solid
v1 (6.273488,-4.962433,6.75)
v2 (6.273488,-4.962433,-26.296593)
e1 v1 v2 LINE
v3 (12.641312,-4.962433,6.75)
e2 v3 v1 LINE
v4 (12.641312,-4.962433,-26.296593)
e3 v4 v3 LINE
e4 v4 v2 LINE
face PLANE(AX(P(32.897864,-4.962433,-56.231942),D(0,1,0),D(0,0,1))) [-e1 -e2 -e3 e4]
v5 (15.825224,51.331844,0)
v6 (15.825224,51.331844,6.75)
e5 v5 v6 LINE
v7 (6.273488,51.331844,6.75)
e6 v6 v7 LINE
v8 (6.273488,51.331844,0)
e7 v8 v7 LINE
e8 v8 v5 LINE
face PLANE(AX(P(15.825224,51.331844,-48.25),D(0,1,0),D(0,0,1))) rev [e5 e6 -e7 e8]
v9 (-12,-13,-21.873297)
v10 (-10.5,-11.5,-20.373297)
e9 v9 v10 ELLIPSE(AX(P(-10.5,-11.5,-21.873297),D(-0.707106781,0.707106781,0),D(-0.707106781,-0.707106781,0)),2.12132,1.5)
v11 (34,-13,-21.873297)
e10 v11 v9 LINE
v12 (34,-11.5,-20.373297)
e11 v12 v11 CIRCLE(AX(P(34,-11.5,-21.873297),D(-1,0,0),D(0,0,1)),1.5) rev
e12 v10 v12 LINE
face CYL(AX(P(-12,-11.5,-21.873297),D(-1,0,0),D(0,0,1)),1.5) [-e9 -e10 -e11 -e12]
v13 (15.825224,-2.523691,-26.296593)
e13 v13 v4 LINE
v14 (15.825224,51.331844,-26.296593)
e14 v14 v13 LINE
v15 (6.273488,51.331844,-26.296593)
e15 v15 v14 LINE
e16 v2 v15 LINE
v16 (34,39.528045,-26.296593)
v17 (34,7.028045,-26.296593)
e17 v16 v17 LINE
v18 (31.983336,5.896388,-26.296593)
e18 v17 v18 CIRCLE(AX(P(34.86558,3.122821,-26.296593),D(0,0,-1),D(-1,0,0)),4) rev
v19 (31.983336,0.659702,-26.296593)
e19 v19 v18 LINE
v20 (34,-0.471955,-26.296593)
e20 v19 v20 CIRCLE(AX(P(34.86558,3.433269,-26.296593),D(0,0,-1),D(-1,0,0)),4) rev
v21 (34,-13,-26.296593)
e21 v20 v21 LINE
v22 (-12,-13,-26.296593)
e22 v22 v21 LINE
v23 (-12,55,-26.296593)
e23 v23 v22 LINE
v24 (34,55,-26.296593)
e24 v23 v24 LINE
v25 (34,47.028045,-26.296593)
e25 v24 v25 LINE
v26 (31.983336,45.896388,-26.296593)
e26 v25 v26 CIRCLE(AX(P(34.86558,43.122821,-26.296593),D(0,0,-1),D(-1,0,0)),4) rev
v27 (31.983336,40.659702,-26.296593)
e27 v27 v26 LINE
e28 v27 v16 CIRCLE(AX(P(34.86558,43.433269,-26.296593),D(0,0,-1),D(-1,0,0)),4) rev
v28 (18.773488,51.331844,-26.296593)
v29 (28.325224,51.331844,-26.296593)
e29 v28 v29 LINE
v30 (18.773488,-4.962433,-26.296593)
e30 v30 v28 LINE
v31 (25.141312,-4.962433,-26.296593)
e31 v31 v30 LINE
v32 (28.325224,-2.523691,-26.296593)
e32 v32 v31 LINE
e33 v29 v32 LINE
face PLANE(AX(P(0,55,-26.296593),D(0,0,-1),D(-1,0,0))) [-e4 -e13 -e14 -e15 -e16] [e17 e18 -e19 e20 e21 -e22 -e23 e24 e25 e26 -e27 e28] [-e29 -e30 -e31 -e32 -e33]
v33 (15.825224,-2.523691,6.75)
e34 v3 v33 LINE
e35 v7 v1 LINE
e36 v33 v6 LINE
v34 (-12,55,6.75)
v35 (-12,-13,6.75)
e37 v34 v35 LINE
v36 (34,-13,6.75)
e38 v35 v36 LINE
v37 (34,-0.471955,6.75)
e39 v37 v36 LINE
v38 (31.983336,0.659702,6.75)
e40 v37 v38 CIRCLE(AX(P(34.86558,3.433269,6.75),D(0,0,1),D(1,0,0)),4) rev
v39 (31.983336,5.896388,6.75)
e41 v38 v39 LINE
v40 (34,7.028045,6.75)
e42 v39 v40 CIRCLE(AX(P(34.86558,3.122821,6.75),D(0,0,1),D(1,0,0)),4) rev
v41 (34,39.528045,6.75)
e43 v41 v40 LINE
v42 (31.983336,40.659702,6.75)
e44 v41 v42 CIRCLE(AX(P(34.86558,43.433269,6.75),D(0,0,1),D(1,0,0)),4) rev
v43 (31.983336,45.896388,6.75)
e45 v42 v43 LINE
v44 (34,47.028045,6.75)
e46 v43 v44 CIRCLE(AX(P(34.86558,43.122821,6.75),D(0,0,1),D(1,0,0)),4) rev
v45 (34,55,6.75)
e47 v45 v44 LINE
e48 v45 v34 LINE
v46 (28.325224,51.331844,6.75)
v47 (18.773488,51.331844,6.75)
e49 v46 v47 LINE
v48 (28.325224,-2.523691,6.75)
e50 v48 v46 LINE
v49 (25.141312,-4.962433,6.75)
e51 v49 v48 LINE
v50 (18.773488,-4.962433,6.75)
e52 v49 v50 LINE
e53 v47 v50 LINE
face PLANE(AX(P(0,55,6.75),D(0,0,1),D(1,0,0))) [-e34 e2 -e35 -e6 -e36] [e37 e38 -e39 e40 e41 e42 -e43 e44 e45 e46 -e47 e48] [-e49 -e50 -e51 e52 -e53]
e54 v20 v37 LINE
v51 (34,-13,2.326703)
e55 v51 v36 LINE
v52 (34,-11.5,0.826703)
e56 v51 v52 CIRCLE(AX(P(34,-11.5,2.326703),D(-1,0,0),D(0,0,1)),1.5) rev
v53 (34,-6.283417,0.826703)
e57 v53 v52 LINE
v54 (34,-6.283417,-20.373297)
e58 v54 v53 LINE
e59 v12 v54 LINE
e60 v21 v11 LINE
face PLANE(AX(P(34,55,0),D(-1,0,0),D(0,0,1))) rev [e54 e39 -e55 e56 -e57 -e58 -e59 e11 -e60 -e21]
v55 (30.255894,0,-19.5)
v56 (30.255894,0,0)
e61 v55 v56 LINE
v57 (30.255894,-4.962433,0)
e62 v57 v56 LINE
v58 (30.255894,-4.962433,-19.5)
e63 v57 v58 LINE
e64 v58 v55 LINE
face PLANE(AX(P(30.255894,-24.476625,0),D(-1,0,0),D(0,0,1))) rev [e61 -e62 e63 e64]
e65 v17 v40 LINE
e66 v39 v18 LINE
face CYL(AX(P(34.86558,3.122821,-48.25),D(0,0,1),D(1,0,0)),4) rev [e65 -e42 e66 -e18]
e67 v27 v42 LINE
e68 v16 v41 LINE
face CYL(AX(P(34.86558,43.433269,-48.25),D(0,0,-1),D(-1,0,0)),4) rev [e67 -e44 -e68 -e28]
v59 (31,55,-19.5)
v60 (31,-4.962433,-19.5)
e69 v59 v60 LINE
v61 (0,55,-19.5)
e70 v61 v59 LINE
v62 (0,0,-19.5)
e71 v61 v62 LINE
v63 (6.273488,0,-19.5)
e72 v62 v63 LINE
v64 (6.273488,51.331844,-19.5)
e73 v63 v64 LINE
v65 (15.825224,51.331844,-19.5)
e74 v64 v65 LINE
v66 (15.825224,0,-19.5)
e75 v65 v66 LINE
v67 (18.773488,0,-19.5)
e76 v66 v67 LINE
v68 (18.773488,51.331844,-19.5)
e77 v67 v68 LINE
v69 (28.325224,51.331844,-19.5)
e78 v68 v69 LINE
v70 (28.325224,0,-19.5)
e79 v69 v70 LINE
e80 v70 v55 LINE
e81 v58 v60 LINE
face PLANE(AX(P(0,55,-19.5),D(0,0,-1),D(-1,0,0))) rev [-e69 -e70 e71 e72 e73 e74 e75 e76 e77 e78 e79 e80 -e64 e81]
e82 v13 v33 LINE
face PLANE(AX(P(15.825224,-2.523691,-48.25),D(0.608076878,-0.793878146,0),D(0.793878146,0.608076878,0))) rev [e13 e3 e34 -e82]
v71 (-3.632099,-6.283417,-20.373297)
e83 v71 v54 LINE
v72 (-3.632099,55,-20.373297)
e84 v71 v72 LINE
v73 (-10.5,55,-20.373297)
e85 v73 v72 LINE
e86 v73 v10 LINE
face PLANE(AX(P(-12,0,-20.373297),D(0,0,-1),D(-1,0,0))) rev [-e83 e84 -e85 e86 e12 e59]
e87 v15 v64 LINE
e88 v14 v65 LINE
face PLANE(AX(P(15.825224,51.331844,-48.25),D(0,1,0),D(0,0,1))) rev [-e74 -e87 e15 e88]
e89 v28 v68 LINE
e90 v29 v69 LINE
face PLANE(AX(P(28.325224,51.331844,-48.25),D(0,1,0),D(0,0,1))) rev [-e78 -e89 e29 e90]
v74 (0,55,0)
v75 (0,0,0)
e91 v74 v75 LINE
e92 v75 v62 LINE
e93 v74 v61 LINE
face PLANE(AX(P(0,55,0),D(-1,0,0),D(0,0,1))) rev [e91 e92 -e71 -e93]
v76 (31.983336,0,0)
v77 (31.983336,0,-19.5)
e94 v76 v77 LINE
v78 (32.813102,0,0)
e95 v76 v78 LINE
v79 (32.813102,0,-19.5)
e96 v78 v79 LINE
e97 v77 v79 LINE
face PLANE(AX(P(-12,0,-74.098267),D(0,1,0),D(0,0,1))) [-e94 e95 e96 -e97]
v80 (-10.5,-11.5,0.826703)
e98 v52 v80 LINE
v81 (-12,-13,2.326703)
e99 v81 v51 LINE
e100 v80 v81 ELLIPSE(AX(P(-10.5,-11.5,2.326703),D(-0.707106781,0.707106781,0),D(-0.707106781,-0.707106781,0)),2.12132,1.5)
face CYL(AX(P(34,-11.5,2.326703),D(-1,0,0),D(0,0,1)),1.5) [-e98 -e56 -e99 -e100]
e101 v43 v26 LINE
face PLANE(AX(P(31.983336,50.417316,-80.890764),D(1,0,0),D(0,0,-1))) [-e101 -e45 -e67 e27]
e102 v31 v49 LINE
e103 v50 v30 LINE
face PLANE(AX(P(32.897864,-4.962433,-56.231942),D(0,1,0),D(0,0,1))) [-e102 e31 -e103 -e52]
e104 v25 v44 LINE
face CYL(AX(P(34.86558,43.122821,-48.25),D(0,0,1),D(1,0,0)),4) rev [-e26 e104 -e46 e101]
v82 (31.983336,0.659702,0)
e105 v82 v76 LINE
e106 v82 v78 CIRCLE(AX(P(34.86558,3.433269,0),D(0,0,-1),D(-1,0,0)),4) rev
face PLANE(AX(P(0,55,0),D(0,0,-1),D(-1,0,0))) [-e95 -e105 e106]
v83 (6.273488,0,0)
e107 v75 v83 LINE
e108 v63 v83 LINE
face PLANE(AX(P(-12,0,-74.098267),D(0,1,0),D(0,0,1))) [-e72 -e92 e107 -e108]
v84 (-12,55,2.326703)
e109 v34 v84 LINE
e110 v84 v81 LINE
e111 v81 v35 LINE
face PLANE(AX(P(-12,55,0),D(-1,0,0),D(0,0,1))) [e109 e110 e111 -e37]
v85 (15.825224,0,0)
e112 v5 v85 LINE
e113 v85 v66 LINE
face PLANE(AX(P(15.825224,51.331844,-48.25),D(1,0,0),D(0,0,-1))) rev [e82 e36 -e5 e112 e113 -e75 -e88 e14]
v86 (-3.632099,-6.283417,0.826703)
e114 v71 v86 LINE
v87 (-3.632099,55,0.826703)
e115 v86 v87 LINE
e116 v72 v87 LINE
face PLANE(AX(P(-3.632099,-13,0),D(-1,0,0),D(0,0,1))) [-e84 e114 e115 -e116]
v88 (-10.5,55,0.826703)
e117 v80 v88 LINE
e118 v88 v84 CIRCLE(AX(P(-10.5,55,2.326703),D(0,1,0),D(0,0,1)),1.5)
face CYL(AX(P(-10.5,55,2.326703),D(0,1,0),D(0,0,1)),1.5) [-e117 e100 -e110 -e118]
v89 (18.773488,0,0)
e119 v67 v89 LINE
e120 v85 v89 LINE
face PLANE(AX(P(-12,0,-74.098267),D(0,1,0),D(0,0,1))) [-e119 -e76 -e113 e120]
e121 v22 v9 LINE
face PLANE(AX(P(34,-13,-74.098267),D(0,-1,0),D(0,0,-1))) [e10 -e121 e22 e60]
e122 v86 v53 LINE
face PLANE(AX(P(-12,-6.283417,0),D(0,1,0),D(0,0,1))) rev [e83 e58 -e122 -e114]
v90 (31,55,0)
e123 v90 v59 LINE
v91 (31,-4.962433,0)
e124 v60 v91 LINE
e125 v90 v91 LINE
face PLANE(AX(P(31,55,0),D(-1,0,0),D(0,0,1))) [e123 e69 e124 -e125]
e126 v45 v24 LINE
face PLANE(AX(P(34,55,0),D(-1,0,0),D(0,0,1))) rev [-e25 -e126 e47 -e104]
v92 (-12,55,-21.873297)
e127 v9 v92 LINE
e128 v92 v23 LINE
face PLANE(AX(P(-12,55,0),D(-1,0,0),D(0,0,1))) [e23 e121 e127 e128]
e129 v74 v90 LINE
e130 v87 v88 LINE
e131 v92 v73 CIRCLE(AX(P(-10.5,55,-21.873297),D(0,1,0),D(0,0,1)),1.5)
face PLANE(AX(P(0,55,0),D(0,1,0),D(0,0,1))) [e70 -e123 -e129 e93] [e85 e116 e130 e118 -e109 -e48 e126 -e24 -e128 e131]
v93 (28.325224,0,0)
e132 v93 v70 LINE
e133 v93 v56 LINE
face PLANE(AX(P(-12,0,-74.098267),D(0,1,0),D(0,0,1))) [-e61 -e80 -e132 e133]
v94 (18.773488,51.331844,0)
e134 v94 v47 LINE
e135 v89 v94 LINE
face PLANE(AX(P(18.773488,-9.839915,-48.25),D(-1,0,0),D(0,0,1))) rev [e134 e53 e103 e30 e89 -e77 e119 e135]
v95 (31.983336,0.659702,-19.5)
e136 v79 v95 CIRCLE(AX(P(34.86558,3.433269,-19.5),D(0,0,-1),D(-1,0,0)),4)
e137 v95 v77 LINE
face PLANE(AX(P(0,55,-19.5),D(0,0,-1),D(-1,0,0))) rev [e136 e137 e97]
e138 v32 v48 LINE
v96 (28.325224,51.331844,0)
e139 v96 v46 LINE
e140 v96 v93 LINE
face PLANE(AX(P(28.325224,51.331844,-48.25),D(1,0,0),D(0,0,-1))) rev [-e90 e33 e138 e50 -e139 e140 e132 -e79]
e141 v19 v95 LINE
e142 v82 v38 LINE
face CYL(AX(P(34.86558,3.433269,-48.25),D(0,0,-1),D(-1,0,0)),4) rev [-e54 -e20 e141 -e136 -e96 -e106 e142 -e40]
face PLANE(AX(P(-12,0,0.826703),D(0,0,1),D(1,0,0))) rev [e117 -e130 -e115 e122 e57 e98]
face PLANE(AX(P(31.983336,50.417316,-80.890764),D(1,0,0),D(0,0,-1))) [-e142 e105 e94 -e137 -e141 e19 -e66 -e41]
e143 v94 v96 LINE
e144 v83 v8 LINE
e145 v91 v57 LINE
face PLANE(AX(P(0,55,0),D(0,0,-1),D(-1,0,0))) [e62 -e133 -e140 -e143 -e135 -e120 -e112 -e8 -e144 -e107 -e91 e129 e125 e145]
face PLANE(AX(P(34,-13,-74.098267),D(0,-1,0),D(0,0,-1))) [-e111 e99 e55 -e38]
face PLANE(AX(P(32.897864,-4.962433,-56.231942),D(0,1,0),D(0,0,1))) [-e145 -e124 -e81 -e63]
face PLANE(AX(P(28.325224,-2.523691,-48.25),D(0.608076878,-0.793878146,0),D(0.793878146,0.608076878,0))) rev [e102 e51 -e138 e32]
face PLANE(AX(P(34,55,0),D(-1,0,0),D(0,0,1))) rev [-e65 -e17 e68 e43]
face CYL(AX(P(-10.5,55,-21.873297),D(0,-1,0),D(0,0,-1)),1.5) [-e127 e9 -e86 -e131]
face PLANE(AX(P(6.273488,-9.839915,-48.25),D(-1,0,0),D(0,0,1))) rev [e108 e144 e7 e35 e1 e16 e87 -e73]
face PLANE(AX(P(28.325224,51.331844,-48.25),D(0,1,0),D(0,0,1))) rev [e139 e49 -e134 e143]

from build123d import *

# Parameters (mm, degrees)
BOSS_EXTRUDE1_DEPTH = 55
SKETCH2_W           = 46
SKETCH2_H           = 13
BOSS_EXTRUDE2_DEPTH = 33.046593186
CUT_EXTRUDE1_DEPTH  = 77.370876735
SKETCH4_W           = 3
SKETCH4_H           = 21.2
CUT_EXTRUDE2_DEPTH  = 81.445701024
CUT_EXTRUDE5_DEPTH  = 55
BOSS_EXTRUDE3_START = -33.046593
SKETCH6_W           = 29.264894646
SKETCH6_H           = 6.300081486
BOSS_EXTRUDE3_DEPTH = 33.046593
SKETCH7_W           = 21.2
SKETCH7_H           = 6.716582595
CUT_EXTRUDE6_DEPTH  = 77.370876735
SKETCH8_W           = 3.134420474
SKETCH8_H           = 7.5
CUT_EXTRUDE7_DEPTH  = 55
FILLET1_R           = 4
BOSS_EXTRUDE4_START = -33.046593
SKETCH9_W           = 1.727441698
SKETCH9_H           = 54.56683481
BOSS_EXTRUDE4_DEPTH = 33.046593
SKETCH10_W          = 0.74410578
SKETCH10_H          = 19.5
CUT_EXTRUDE8_DEPTH  = 59.962432577
FILLET2_R           = 1.5


with BuildPart() as part:
    # Sketch1 → Boss-Extrude1 (new body)
    with BuildSketch(Plane(origin=(0, 0, 0), x_dir=(1, 0, 0), z_dir=(0, 1, 0))):
        Polygon((31, -3.75), (31, 0), (0, 0), (0, 19.5), (31, 19.5), (31, 23.296593186), (34, 23.296593186), (34, 26.296593186), (-12, 26.296593186), (-12, -6.75), (34, -6.75), (34, -3.75), align=None)
        Polygon((31, 9.75), (31, 0), (31, -3.75), (34, -3.75), (34, 23.296593186), (31, 23.296593186), (31, 19.5), align=None)
    extrude(amount=BOSS_EXTRUDE1_DEPTH)

    # Sketch2 → Boss-Extrude2 (add)
    with BuildSketch(Plane.XY.offset(6.75)):
        with Locations((11, -6.5)):
            Rectangle(SKETCH2_W, SKETCH2_H)
    extrude(amount=-BOSS_EXTRUDE2_DEPTH)

    # Sketch3 → Cut-Extrude1 (cut, through all)
    with BuildSketch(Plane(origin=(34, 0, 0), x_dir=(0, 0, -1), z_dir=(1, 0, 0))):
        Polygon((-0.826703407, -6.283417405), (-0.826703407, -13), (9.773296593, -13), (20.373296593, -13), (20.373296593, -6.283417405), align=None)
    extrude(amount=-CUT_EXTRUDE1_DEPTH, mode=Mode.SUBTRACT)

    # Sketch4 → Cut-Extrude2 (cut, through all)
    with BuildSketch(Plane(origin=(0, 55, 0), x_dir=(1, 0, 0), z_dir=(0, 1, 0))):
        with Locations((-5.132099024, 9.773296593)):
            Rectangle(SKETCH4_W, SKETCH4_H)
        Polygon((-12, 20.373296593), (-12, 9.773296593), (-12, -0.826703407), (-6.632099024, -0.826703407), (-6.632099024, 20.373296593), align=None)
    extrude(amount=-CUT_EXTRUDE2_DEPTH, mode=Mode.SUBTRACT)

    # Sketch5 → Cut-Extrude5 (cut)
    with BuildSketch(Plane.XY.offset(6.75)):
        Polygon((28.325224087, 51.33184393), (18.77348764, 51.33184393), (18.77348764, 44.015620269), (18.77348764, -9.839915018), (28.325224087, -2.523691356), align=None)
        Polygon((6.27348764, -9.839915018), (6.27348764, 44.015620269), (6.27348764, 51.33184393), (15.825224087, 51.33184393), (15.825224087, -2.523691356), align=None)
    extrude(amount=-CUT_EXTRUDE5_DEPTH, mode=Mode.SUBTRACT)

    # Sketch6 → Boss-Extrude3 (add)
    with BuildSketch(Plane.XY.offset(6.75).offset(BOSS_EXTRUDE3_START)):
        with Locations((18.265416553, -8.11247332)):
            Rectangle(SKETCH6_W, SKETCH6_H)
    extrude(amount=BOSS_EXTRUDE3_DEPTH)

    # Sketch7 → Cut-Extrude6 (cut, through all)
    with BuildSketch(Plane(origin=(34, 0, 0), x_dir=(0, 0, -1), z_dir=(1, 0, 0))):
        with Locations((9.773296593, -9.641708703)):
            Rectangle(SKETCH7_W, SKETCH7_H)
    extrude(amount=-CUT_EXTRUDE6_DEPTH, mode=Mode.SUBTRACT)

    # Sketch8 → Cut-Extrude7 (cut)
    with BuildSketch(Plane.XY.offset(6.75)):
        with Locations((32.432789763, 3.278045091)):
            Rectangle(SKETCH8_W, SKETCH8_H)
        with Locations((32.432789763, 43.278045091)):
            Rectangle(SKETCH8_W, SKETCH8_H)
    extrude(amount=-CUT_EXTRUDE7_DEPTH, mode=Mode.SUBTRACT)

    # Fillet1
    # the kernel refuses this fillet: 4 mm, written as the material it adds along each edge
    with BuildSketch(Plane(origin=(30.865579526, -0.471954909, 6.75), x_dir=(1, 0, 0), z_dir=(0, 0, -1))) as fillet1_piece_1_section:
        with BuildLine():
            CenterArc((4, -3.905223692), FILLET1_R, 102.497374798, 77.502625202)
            Line((0, -3.905223692), (-0.08, -3.905223692))
            Line((-0.08, -3.905223692), (-0.08, 0))
            Line((-0.08, 0), (0, 0.08))
            ThreePointArc((0, 0.08), (1.567210237, 0.08), (3.117108884, 0.078104474))
            Line((3.117108884, 0.078104474), (3.134420474, 0))
        make_face()
    fillet1_piece_1 = extrude(amount=33.046593186, mode=Mode.PRIVATE)
    fillet1_piece_1 = split(fillet1_piece_1, bisect_by=Plane(origin=(32.12921107, 0, 3.375), z_dir=(0, -1, 0)), keep=Keep.TOP, mode=Mode.PRIVATE)
    fillet1_piece_1 = split(fillet1_piece_1, bisect_by=Plane(origin=(32.12921107, -0.298742451, 0), z_dir=(0, 0, 1)), keep=Keep.TOP, mode=Mode.PRIVATE)
    add(fillet1_piece_1)
    with BuildSketch(Plane(origin=(30.865579526, -0.471954909, 6.75), x_dir=(1, 0, 0), z_dir=(0, 0, -1))) as fillet1_piece_2_section:
        with BuildLine():
            CenterArc((4, -3.905223692), FILLET1_R, 102.497374798, 77.502625202)
            Line((0, -3.905223692), (-0.08, -3.905223692))
            Line((-0.08, -3.905223692), (-0.08, 0))
            Line((-0.08, 0), (0, 0.08))
            ThreePointArc((0, 0.08), (1.567210237, 0.08), (3.117108884, 0.078104474))
            Line((3.117108884, 0.078104474), (3.134420474, 0))
        make_face()
    fillet1_piece_2 = extrude(amount=33.046593186, mode=Mode.PRIVATE)
    fillet1_piece_2 = split(fillet1_piece_2, bisect_by=Plane(origin=(31.341073978, 0, 3.375), z_dir=(0, 1, 0)), keep=Keep.TOP, mode=Mode.PRIVATE)
    fillet1_piece_2 = split(fillet1_piece_2, bisect_by=Plane(origin=(31.341073978, 0.922666131, 0), z_dir=(0, 0, 1)), keep=Keep.TOP, mode=Mode.PRIVATE)
    add(fillet1_piece_2)
    with BuildSketch(Plane(origin=(30.865579526, -0.471954909, 6.75), x_dir=(1, 0, 0), z_dir=(0, 0, -1))) as fillet1_piece_3_section:
        with BuildLine():
            CenterArc((4, -3.905223692), FILLET1_R, 102.497374798, 77.502625202)
            Line((0, -3.905223692), (-0.08, -3.905223692))
            Line((-0.08, -3.905223692), (-0.08, 0))
            Line((-0.08, 0), (0, 0.08))
            ThreePointArc((0, 0.08), (1.567210237, 0.08), (3.117108884, 0.078104474))
            Line((3.117108884, 0.078104474), (3.134420474, 0))
        make_face()
    fillet1_piece_3 = extrude(amount=33.046593186, mode=Mode.PRIVATE)
    fillet1_piece_3 = split(fillet1_piece_3, bisect_by=Plane(origin=(32.12921107, -0.298742451, -19.5), z_dir=(0, 0, 1)), keep=Keep.TOP, mode=Mode.PRIVATE)
    fillet1_piece_3 = split(fillet1_piece_3, bisect_by=Plane(origin=(32.12921107, 0, -9.75), z_dir=(0, -1, 0)), keep=Keep.TOP, mode=Mode.PRIVATE)
    fillet1_piece_3 = split(fillet1_piece_3, bisect_by=Plane(origin=(32.12921107, -0.298742451, 0), z_dir=(0, 0, -1)), keep=Keep.TOP, mode=Mode.PRIVATE)
    add(fillet1_piece_3)
    with BuildSketch(Plane(origin=(30.865579526, -0.471954909, 6.75), x_dir=(1, 0, 0), z_dir=(0, 0, -1))) as fillet1_piece_4_section:
        with BuildLine():
            CenterArc((4, -3.905223692), FILLET1_R, 102.497374798, 77.502625202)
            Line((0, -3.905223692), (-0.08, -3.905223692))
            Line((-0.08, -3.905223692), (-0.08, 0))
            Line((-0.08, 0), (0, 0.08))
            ThreePointArc((0, 0.08), (1.567210237, 0.08), (3.117108884, 0.078104474))
            Line((3.117108884, 0.078104474), (3.134420474, 0))
        make_face()
    fillet1_piece_4 = extrude(amount=33.046593186, mode=Mode.PRIVATE)
    fillet1_piece_4 = split(fillet1_piece_4, bisect_by=Plane(origin=(32.12921107, -0.298742451, -19.5), z_dir=(0, 0, -1)), keep=Keep.TOP, mode=Mode.PRIVATE)
    fillet1_piece_4 = split(fillet1_piece_4, bisect_by=Plane(origin=(32.12921107, 0, -22.898296593), z_dir=(0, -1, 0)), keep=Keep.TOP, mode=Mode.PRIVATE)
    add(fillet1_piece_4)
    with BuildSketch(Plane(origin=(30.865579526, -0.471954909, 6.75), x_dir=(1, 0, 0), z_dir=(0, 0, -1))) as fillet1_piece_5_section:
        with BuildLine():
            CenterArc((4, -3.905223692), FILLET1_R, 102.497374798, 77.502625202)
            Line((0, -3.905223692), (-0.08, -3.905223692))
            Line((-0.08, -3.905223692), (-0.08, 0))
            Line((-0.08, 0), (0, 0.08))
            ThreePointArc((0, 0.08), (1.567210237, 0.08), (3.117108884, 0.078104474))
            Line((3.117108884, 0.078104474), (3.134420474, 0))
        make_face()
    fillet1_piece_5 = extrude(amount=33.046593186, mode=Mode.PRIVATE)
    fillet1_piece_5 = split(fillet1_piece_5, bisect_by=Plane(origin=(31.341073978, 0.922666131, -19.5), z_dir=(0, 0, -1)), keep=Keep.TOP, mode=Mode.PRIVATE)
    fillet1_piece_5 = split(fillet1_piece_5, bisect_by=Plane(origin=(31.341073978, 0, -22.898296593), z_dir=(0, 1, 0)), keep=Keep.TOP, mode=Mode.PRIVATE)
    add(fillet1_piece_5)
    with BuildSketch(Plane(origin=(30.865579526, 7.028045091, -9.73694077), x_dir=(0, -1, 0), z_dir=(0, 0, -1))) as fillet1_piece_6_section:
        with BuildLine():
            CenterArc((3.905223692, -4), FILLET1_R, 90, 77.502625202)
            Line((0, -3.134420474), (-0.078104474, -3.117108884))
            ThreePointArc((-0.078104474, -3.117108884), (-0.08, -1.567210237), (-0.08, 0))
            Line((-0.08, 0), (0, 0.08))
            Line((0, 0.08), (3.905223692, 0.08))
            Line((3.905223692, 0.08), (3.905223692, 0))
        make_face()
    fillet1_piece_6 = extrude(amount=16.559652417, mode=Mode.PRIVATE)
    fillet1_piece_6 = split(fillet1_piece_6, bisect_by=Plane(origin=(31.850173209, 6.325117435, -19.5), z_dir=(0, 0, 1)), keep=Keep.TOP, mode=Mode.PRIVATE)
    fillet1_piece_6 = split(fillet1_piece_6, bisect_by=Plane(origin=(31, 6.325117435, -14.618470385), z_dir=(1, 0, 0)), keep=Keep.TOP, mode=Mode.PRIVATE)
    add(fillet1_piece_6)
    with BuildSketch(Plane(origin=(30.865579526, 7.028045091, -19.5), x_dir=(0, -1, 0), z_dir=(0, 0, -1))) as fillet1_piece_7_section:
        with BuildLine():
            CenterArc((3.905223692, -4), FILLET1_R, 90, 77.502625202)
            Line((0, -3.134420474), (-0.078104474, -3.117108884))
            ThreePointArc((-0.078104474, -3.117108884), (-0.08, -1.567210237), (-0.08, 0))
            Line((-0.08, 0), (0, 0.08))
            Line((0, 0.08), (3.905223692, 0.08))
            Line((3.905223692, 0.08), (3.905223692, 0))
        make_face()
    fillet1_piece_7 = extrude(amount=6.796593186, mode=Mode.PRIVATE)
    fillet1_piece_7 = split(fillet1_piece_7, bisect_by=Plane(origin=(31, 5.302848629, -22.898296593), z_dir=(-1, 0, 0)), keep=Keep.TOP, mode=Mode.PRIVATE)
    add(fillet1_piece_7)
    with BuildSketch(Plane(origin=(30.865579526, 7.028045091, -19.5), x_dir=(0, -1, 0), z_dir=(0, 0, -1))) as fillet1_piece_8_section:
        with BuildLine():
            CenterArc((3.905223692, -4), FILLET1_R, 90, 77.502625202)
            Line((0, -3.134420474), (-0.078104474, -3.117108884))
            ThreePointArc((-0.078104474, -3.117108884), (-0.08, -1.567210237), (-0.08, 0))
            Line((-0.08, 0), (0, 0.08))
            Line((0, 0.08), (3.905223692, 0.08))
            Line((3.905223692, 0.08), (3.905223692, 0))
        make_face()
    fillet1_piece_8 = extrude(amount=6.796593186, mode=Mode.PRIVATE)
    fillet1_piece_8 = split(fillet1_piece_8, bisect_by=Plane(origin=(31, 6.325117435, -22.898296593), z_dir=(1, 0, 0)), keep=Keep.TOP, mode=Mode.PRIVATE)
    add(fillet1_piece_8)
    with BuildSketch(Plane(origin=(30.865579526, 7.028045091, 6.75), x_dir=(0, -1, 0), z_dir=(0, 0, -1))) as fillet1_piece_9_section:
        with BuildLine():
            CenterArc((3.905223692, -4), FILLET1_R, 90, 77.502625202)
            Line((0, -3.134420474), (-0.078104474, -3.117108884))
            ThreePointArc((-0.078104474, -3.117108884), (-0.08, -1.567210237), (-0.08, 0))
            Line((-0.08, 0), (0, 0.08))
            Line((0, 0.08), (3.905223692, 0.08))
            Line((3.905223692, 0.08), (3.905223692, 0))
        make_face()
    fillet1_piece_9 = extrude(amount=6.75, mode=Mode.PRIVATE)
    fillet1_piece_9 = split(fillet1_piece_9, bisect_by=Plane(origin=(31, 5.302848629, 3.375), z_dir=(-1, 0, 0)), keep=Keep.TOP, mode=Mode.PRIVATE)
    add(fillet1_piece_9)
    with BuildSketch(Plane(origin=(30.865579526, 7.028045091, 6.75), x_dir=(0, -1, 0), z_dir=(0, 0, -1))) as fillet1_piece_10_section:
        with BuildLine():
            CenterArc((3.905223692, -4), FILLET1_R, 90, 77.502625202)
            Line((0, -3.134420474), (-0.078104474, -3.117108884))
            ThreePointArc((-0.078104474, -3.117108884), (-0.08, -1.567210237), (-0.08, 0))
            Line((-0.08, 0), (0, 0.08))
            Line((0, 0.08), (3.905223692, 0.08))
            Line((3.905223692, 0.08), (3.905223692, 0))
        make_face()
    fillet1_piece_10 = extrude(amount=6.75, mode=Mode.PRIVATE)
    fillet1_piece_10 = split(fillet1_piece_10, bisect_by=Plane(origin=(31, 6.325117435, 3.375), z_dir=(1, 0, 0)), keep=Keep.TOP, mode=Mode.PRIVATE)
    add(fillet1_piece_10)
    with BuildSketch(Plane(origin=(30.865579526, 7.028045091, 6.75), x_dir=(0, -1, 0), z_dir=(0, 0, -1))) as fillet1_piece_11_section:
        with BuildLine():
            CenterArc((3.905223692, -4), FILLET1_R, 90, 77.502625202)
            Line((0, -3.134420474), (-0.078104474, -3.117108884))
            ThreePointArc((-0.078104474, -3.117108884), (-0.08, -1.567210237), (-0.08, 0))
            Line((-0.08, 0), (0, 0.08))
            Line((0, 0.08), (3.905223692, 0.08))
            Line((3.905223692, 0.08), (3.905223692, 0))
        make_face()
    fillet1_piece_11 = extrude(amount=16.51305923, mode=Mode.PRIVATE)
    fillet1_piece_11 = split(fillet1_piece_11, bisect_by=Plane(origin=(31.850173209, 6.325117435, 0), z_dir=(0, 0, -1)), keep=Keep.TOP, mode=Mode.PRIVATE)
    fillet1_piece_11 = split(fillet1_piece_11, bisect_by=Plane(origin=(31, 6.325117435, -4.881529615), z_dir=(1, 0, 0)), keep=Keep.TOP, mode=Mode.PRIVATE)
    add(fillet1_piece_11)
    with BuildSketch(Plane(origin=(30.865579526, 47.028045091, -9.73694077), x_dir=(1, 0, 0), z_dir=(0, 0, -1))) as fillet1_piece_12_section:
        with BuildLine():
            CenterArc((4, 3.905223692), FILLET1_R, 180, 77.502625202)
            Line((0, 3.905223692), (-0.08, 3.905223692))
            Line((-0.08, 3.905223692), (-0.08, 0))
            Line((-0.08, 0), (0, -0.08))
            ThreePointArc((0, -0.08), (1.567210237, -0.08), (3.117108884, -0.078104474))
            Line((3.117108884, -0.078104474), (3.134420474, 0))
        make_face()
    fillet1_piece_12 = extrude(amount=16.559652417, mode=Mode.PRIVATE)
    fillet1_piece_12 = split(fillet1_piece_12, bisect_by=Plane(origin=(31, 46.325117435, -14.618470385), z_dir=(1, 0, 0)), keep=Keep.TOP, mode=Mode.PRIVATE)
    fillet1_piece_12 = split(fillet1_piece_12, bisect_by=Plane(origin=(31.850173209, 46.325117435, -19.5), z_dir=(0, 0, 1)), keep=Keep.TOP, mode=Mode.PRIVATE)
    add(fillet1_piece_12)
    with BuildSketch(Plane(origin=(30.865579526, 47.028045091, -19.5), x_dir=(1, 0, 0), z_dir=(0, 0, -1))) as fillet1_piece_13_section:
        with BuildLine():
            CenterArc((4, 3.905223692), FILLET1_R, 180, 77.502625202)
            Line((0, 3.905223692), (-0.08, 3.905223692))
            Line((-0.08, 3.905223692), (-0.08, 0))
            Line((-0.08, 0), (0, -0.08))
            ThreePointArc((0, -0.08), (1.567210237, -0.08), (3.117108884, -0.078104474))
            Line((3.117108884, -0.078104474), (3.134420474, 0))
        make_face()
    fillet1_piece_13 = extrude(amount=6.796593186, mode=Mode.PRIVATE)
    fillet1_piece_13 = split(fillet1_piece_13, bisect_by=Plane(origin=(31, 46.325117435, -22.898296593), z_dir=(1, 0, 0)), keep=Keep.TOP, mode=Mode.PRIVATE)
    add(fillet1_piece_13)
    with BuildSketch(Plane(origin=(30.865579526, 47.028045091, -19.5), x_dir=(1, 0, 0), z_dir=(0, 0, -1))) as fillet1_piece_14_section:
        with BuildLine():
            CenterArc((4, 3.905223692), FILLET1_R, 180, 77.502625202)
            Line((0, 3.905223692), (-0.08, 3.905223692))
            Line((-0.08, 3.905223692), (-0.08, 0))
            Line((-0.08, 0), (0, -0.08))
            ThreePointArc((0, -0.08), (1.567210237, -0.08), (3.117108884, -0.078104474))
            Line((3.117108884, -0.078104474), (3.134420474, 0))
        make_face()
    fillet1_piece_14 = extrude(amount=6.796593186, mode=Mode.PRIVATE)
    fillet1_piece_14 = split(fillet1_piece_14, bisect_by=Plane(origin=(31, 45.302848629, -22.898296593), z_dir=(-1, 0, 0)), keep=Keep.TOP, mode=Mode.PRIVATE)
    add(fillet1_piece_14)
    with BuildSketch(Plane(origin=(30.865579526, 47.028045091, 6.75), x_dir=(0, -1, 0), z_dir=(0, 0, -1))) as fillet1_piece_15_section:
        with BuildLine():
            CenterArc((3.905223692, -4), FILLET1_R, 90, 77.502625202)
            Line((0, -3.134420474), (-0.078104474, -3.117108884))
            ThreePointArc((-0.078104474, -3.117108884), (-0.08, -1.567210237), (-0.08, 0))
            Line((-0.08, 0), (0, 0.08))
            Line((0, 0.08), (3.905223692, 0.08))
            Line((3.905223692, 0.08), (3.905223692, 0))
        make_face()
    fillet1_piece_15 = extrude(amount=6.75, mode=Mode.PRIVATE)
    fillet1_piece_15 = split(fillet1_piece_15, bisect_by=Plane(origin=(31, 45.302848629, 3.375), z_dir=(-1, 0, 0)), keep=Keep.TOP, mode=Mode.PRIVATE)
    add(fillet1_piece_15)
    with BuildSketch(Plane(origin=(30.865579526, 47.028045091, 6.75), x_dir=(0, -1, 0), z_dir=(0, 0, -1))) as fillet1_piece_16_section:
        with BuildLine():
            CenterArc((3.905223692, -4), FILLET1_R, 90, 77.502625202)
            Line((0, -3.134420474), (-0.078104474, -3.117108884))
            ThreePointArc((-0.078104474, -3.117108884), (-0.08, -1.567210237), (-0.08, 0))
            Line((-0.08, 0), (0, 0.08))
            Line((0, 0.08), (3.905223692, 0.08))
            Line((3.905223692, 0.08), (3.905223692, 0))
        make_face()
    fillet1_piece_16 = extrude(amount=6.75, mode=Mode.PRIVATE)
    fillet1_piece_16 = split(fillet1_piece_16, bisect_by=Plane(origin=(31, 46.325117435, 3.375), z_dir=(1, 0, 0)), keep=Keep.TOP, mode=Mode.PRIVATE)
    add(fillet1_piece_16)
    with BuildSketch(Plane(origin=(30.865579526, 47.028045091, 6.75), x_dir=(0, -1, 0), z_dir=(0, 0, -1))) as fillet1_piece_17_section:
        with BuildLine():
            CenterArc((3.905223692, -4), FILLET1_R, 90, 77.502625202)
            Line((0, -3.134420474), (-0.078104474, -3.117108884))
            ThreePointArc((-0.078104474, -3.117108884), (-0.08, -1.567210237), (-0.08, 0))
            Line((-0.08, 0), (0, 0.08))
            Line((0, 0.08), (3.905223692, 0.08))
            Line((3.905223692, 0.08), (3.905223692, 0))
        make_face()
    fillet1_piece_17 = extrude(amount=16.51305923, mode=Mode.PRIVATE)
    fillet1_piece_17 = split(fillet1_piece_17, bisect_by=Plane(origin=(31.850173209, 46.325117435, 0), z_dir=(0, 0, -1)), keep=Keep.TOP, mode=Mode.PRIVATE)
    fillet1_piece_17 = split(fillet1_piece_17, bisect_by=Plane(origin=(31, 46.325117435, -4.881529615), z_dir=(1, 0, 0)), keep=Keep.TOP, mode=Mode.PRIVATE)
    add(fillet1_piece_17)
    with BuildSketch(Plane(origin=(30.865579526, 39.528045091, -9.73694077), x_dir=(1, 0, 0), z_dir=(0, 0, -1))) as fillet1_piece_18_section:
        with BuildLine():
            CenterArc((4, -3.905223692), FILLET1_R, 102.497374798, 77.502625202)
            Line((0, -3.905223692), (-0.08, -3.905223692))
            Line((-0.08, -3.905223692), (-0.08, 0))
            Line((-0.08, 0), (0, 0.08))
            ThreePointArc((0, 0.08), (1.567210237, 0.08), (3.117108884, 0.078104474))
            Line((3.117108884, 0.078104474), (3.134420474, 0))
        make_face()
    fillet1_piece_18 = extrude(amount=16.559652417, mode=Mode.PRIVATE)
    fillet1_piece_18 = split(fillet1_piece_18, bisect_by=Plane(origin=(31.850173209, 40.230972746, -19.5), z_dir=(0, 0, 1)), keep=Keep.TOP, mode=Mode.PRIVATE)
    fillet1_piece_18 = split(fillet1_piece_18, bisect_by=Plane(origin=(31, 40.230972746, -14.618470385), z_dir=(1, 0, 0)), keep=Keep.TOP, mode=Mode.PRIVATE)
    add(fillet1_piece_18)
    with BuildSketch(Plane(origin=(30.865579526, 39.528045091, -19.5), x_dir=(1, 0, 0), z_dir=(0, 0, -1))) as fillet1_piece_19_section:
        with BuildLine():
            CenterArc((4, -3.905223692), FILLET1_R, 102.497374798, 77.502625202)
            Line((0, -3.905223692), (-0.08, -3.905223692))
            Line((-0.08, -3.905223692), (-0.08, 0))
            Line((-0.08, 0), (0, 0.08))
            ThreePointArc((0, 0.08), (1.567210237, 0.08), (3.117108884, 0.078104474))
            Line((3.117108884, 0.078104474), (3.134420474, 0))
        make_face()
    fillet1_piece_19 = extrude(amount=6.796593186, mode=Mode.PRIVATE)
    fillet1_piece_19 = split(fillet1_piece_19, bisect_by=Plane(origin=(31, 40.230972746, -22.898296593), z_dir=(1, 0, 0)), keep=Keep.TOP, mode=Mode.PRIVATE)
    add(fillet1_piece_19)
    with BuildSketch(Plane(origin=(30.865579526, 39.528045091, -19.5), x_dir=(1, 0, 0), z_dir=(0, 0, -1))) as fillet1_piece_20_section:
        with BuildLine():
            CenterArc((4, -3.905223692), FILLET1_R, 102.497374798, 77.502625202)
            Line((0, -3.905223692), (-0.08, -3.905223692))
            Line((-0.08, -3.905223692), (-0.08, 0))
            Line((-0.08, 0), (0, 0.08))
            ThreePointArc((0, 0.08), (1.567210237, 0.08), (3.117108884, 0.078104474))
            Line((3.117108884, 0.078104474), (3.134420474, 0))
        make_face()
    fillet1_piece_20 = extrude(amount=6.796593186, mode=Mode.PRIVATE)
    fillet1_piece_20 = split(fillet1_piece_20, bisect_by=Plane(origin=(31, 41.253241553, -22.898296593), z_dir=(-1, 0, 0)), keep=Keep.TOP, mode=Mode.PRIVATE)
    add(fillet1_piece_20)
    with BuildSketch(Plane(origin=(30.865579526, 39.528045091, 6.75), x_dir=(1, 0, 0), z_dir=(0, 0, -1))) as fillet1_piece_21_section:
        with BuildLine():
            CenterArc((4, -3.905223692), FILLET1_R, 102.497374798, 77.502625202)
            Line((0, -3.905223692), (-0.08, -3.905223692))
            Line((-0.08, -3.905223692), (-0.08, 0))
            Line((-0.08, 0), (0, 0.08))
            ThreePointArc((0, 0.08), (1.567210237, 0.08), (3.117108884, 0.078104474))
            Line((3.117108884, 0.078104474), (3.134420474, 0))
        make_face()
    fillet1_piece_21 = extrude(amount=6.75, mode=Mode.PRIVATE)
    fillet1_piece_21 = split(fillet1_piece_21, bisect_by=Plane(origin=(31, 40.230972746, 3.375), z_dir=(1, 0, 0)), keep=Keep.TOP, mode=Mode.PRIVATE)
    add(fillet1_piece_21)
    with BuildSketch(Plane(origin=(30.865579526, 39.528045091, 6.75), x_dir=(1, 0, 0), z_dir=(0, 0, -1))) as fillet1_piece_22_section:
        with BuildLine():
            CenterArc((4, -3.905223692), FILLET1_R, 102.497374798, 77.502625202)
            Line((0, -3.905223692), (-0.08, -3.905223692))
            Line((-0.08, -3.905223692), (-0.08, 0))
            Line((-0.08, 0), (0, 0.08))
            ThreePointArc((0, 0.08), (1.567210237, 0.08), (3.117108884, 0.078104474))
            Line((3.117108884, 0.078104474), (3.134420474, 0))
        make_face()
    fillet1_piece_22 = extrude(amount=6.75, mode=Mode.PRIVATE)
    fillet1_piece_22 = split(fillet1_piece_22, bisect_by=Plane(origin=(31, 41.253241553, 3.375), z_dir=(-1, 0, 0)), keep=Keep.TOP, mode=Mode.PRIVATE)
    add(fillet1_piece_22)
    with BuildSketch(Plane(origin=(30.865579526, 39.528045091, 6.75), x_dir=(1, 0, 0), z_dir=(0, 0, -1))) as fillet1_piece_23_section:
        with BuildLine():
            CenterArc((4, -3.905223692), FILLET1_R, 102.497374798, 77.502625202)
            Line((0, -3.905223692), (-0.08, -3.905223692))
            Line((-0.08, -3.905223692), (-0.08, 0))
            Line((-0.08, 0), (0, 0.08))
            ThreePointArc((0, 0.08), (1.567210237, 0.08), (3.117108884, 0.078104474))
            Line((3.117108884, 0.078104474), (3.134420474, 0))
        make_face()
    fillet1_piece_23 = extrude(amount=16.51305923, mode=Mode.PRIVATE)
    fillet1_piece_23 = split(fillet1_piece_23, bisect_by=Plane(origin=(31, 40.230972746, -4.881529615), z_dir=(1, 0, 0)), keep=Keep.TOP, mode=Mode.PRIVATE)
    fillet1_piece_23 = split(fillet1_piece_23, bisect_by=Plane(origin=(31.850173209, 40.230972746, 0), z_dir=(0, 0, -1)), keep=Keep.TOP, mode=Mode.PRIVATE)
    add(fillet1_piece_23)

    # Sketch9 → Boss-Extrude4 (add)
    with BuildSketch(Plane.XY.offset(6.75).offset(BOSS_EXTRUDE4_START)):
        with Locations((31.119615069, 23.133898568)):
            Rectangle(SKETCH9_W, SKETCH9_H)
    extrude(amount=BOSS_EXTRUDE4_DEPTH)

    # Sketch10 → Cut-Extrude8 (cut)
    with BuildSketch(Plane(origin=(0, 55, 0), x_dir=(1, 0, 0), z_dir=(0, 1, 0))):
        with Locations((30.62794711, 9.75)):
            Rectangle(SKETCH10_W, SKETCH10_H)
    extrude(amount=-CUT_EXTRUDE8_DEPTH, mode=Mode.SUBTRACT)

    # Fillet2
    fillet2_edges = [part.edges().sort_by_distance(p)[0] for p in [
        (-12, 21, -20.373296593),
        (11, -13, -20.373296593),
        (-12, 21, 0.826703407),
        (11, -13, 0.826703407),
    ]]
    fillet(fillet2_edges, radius=FILLET2_R)


solid = part.part
